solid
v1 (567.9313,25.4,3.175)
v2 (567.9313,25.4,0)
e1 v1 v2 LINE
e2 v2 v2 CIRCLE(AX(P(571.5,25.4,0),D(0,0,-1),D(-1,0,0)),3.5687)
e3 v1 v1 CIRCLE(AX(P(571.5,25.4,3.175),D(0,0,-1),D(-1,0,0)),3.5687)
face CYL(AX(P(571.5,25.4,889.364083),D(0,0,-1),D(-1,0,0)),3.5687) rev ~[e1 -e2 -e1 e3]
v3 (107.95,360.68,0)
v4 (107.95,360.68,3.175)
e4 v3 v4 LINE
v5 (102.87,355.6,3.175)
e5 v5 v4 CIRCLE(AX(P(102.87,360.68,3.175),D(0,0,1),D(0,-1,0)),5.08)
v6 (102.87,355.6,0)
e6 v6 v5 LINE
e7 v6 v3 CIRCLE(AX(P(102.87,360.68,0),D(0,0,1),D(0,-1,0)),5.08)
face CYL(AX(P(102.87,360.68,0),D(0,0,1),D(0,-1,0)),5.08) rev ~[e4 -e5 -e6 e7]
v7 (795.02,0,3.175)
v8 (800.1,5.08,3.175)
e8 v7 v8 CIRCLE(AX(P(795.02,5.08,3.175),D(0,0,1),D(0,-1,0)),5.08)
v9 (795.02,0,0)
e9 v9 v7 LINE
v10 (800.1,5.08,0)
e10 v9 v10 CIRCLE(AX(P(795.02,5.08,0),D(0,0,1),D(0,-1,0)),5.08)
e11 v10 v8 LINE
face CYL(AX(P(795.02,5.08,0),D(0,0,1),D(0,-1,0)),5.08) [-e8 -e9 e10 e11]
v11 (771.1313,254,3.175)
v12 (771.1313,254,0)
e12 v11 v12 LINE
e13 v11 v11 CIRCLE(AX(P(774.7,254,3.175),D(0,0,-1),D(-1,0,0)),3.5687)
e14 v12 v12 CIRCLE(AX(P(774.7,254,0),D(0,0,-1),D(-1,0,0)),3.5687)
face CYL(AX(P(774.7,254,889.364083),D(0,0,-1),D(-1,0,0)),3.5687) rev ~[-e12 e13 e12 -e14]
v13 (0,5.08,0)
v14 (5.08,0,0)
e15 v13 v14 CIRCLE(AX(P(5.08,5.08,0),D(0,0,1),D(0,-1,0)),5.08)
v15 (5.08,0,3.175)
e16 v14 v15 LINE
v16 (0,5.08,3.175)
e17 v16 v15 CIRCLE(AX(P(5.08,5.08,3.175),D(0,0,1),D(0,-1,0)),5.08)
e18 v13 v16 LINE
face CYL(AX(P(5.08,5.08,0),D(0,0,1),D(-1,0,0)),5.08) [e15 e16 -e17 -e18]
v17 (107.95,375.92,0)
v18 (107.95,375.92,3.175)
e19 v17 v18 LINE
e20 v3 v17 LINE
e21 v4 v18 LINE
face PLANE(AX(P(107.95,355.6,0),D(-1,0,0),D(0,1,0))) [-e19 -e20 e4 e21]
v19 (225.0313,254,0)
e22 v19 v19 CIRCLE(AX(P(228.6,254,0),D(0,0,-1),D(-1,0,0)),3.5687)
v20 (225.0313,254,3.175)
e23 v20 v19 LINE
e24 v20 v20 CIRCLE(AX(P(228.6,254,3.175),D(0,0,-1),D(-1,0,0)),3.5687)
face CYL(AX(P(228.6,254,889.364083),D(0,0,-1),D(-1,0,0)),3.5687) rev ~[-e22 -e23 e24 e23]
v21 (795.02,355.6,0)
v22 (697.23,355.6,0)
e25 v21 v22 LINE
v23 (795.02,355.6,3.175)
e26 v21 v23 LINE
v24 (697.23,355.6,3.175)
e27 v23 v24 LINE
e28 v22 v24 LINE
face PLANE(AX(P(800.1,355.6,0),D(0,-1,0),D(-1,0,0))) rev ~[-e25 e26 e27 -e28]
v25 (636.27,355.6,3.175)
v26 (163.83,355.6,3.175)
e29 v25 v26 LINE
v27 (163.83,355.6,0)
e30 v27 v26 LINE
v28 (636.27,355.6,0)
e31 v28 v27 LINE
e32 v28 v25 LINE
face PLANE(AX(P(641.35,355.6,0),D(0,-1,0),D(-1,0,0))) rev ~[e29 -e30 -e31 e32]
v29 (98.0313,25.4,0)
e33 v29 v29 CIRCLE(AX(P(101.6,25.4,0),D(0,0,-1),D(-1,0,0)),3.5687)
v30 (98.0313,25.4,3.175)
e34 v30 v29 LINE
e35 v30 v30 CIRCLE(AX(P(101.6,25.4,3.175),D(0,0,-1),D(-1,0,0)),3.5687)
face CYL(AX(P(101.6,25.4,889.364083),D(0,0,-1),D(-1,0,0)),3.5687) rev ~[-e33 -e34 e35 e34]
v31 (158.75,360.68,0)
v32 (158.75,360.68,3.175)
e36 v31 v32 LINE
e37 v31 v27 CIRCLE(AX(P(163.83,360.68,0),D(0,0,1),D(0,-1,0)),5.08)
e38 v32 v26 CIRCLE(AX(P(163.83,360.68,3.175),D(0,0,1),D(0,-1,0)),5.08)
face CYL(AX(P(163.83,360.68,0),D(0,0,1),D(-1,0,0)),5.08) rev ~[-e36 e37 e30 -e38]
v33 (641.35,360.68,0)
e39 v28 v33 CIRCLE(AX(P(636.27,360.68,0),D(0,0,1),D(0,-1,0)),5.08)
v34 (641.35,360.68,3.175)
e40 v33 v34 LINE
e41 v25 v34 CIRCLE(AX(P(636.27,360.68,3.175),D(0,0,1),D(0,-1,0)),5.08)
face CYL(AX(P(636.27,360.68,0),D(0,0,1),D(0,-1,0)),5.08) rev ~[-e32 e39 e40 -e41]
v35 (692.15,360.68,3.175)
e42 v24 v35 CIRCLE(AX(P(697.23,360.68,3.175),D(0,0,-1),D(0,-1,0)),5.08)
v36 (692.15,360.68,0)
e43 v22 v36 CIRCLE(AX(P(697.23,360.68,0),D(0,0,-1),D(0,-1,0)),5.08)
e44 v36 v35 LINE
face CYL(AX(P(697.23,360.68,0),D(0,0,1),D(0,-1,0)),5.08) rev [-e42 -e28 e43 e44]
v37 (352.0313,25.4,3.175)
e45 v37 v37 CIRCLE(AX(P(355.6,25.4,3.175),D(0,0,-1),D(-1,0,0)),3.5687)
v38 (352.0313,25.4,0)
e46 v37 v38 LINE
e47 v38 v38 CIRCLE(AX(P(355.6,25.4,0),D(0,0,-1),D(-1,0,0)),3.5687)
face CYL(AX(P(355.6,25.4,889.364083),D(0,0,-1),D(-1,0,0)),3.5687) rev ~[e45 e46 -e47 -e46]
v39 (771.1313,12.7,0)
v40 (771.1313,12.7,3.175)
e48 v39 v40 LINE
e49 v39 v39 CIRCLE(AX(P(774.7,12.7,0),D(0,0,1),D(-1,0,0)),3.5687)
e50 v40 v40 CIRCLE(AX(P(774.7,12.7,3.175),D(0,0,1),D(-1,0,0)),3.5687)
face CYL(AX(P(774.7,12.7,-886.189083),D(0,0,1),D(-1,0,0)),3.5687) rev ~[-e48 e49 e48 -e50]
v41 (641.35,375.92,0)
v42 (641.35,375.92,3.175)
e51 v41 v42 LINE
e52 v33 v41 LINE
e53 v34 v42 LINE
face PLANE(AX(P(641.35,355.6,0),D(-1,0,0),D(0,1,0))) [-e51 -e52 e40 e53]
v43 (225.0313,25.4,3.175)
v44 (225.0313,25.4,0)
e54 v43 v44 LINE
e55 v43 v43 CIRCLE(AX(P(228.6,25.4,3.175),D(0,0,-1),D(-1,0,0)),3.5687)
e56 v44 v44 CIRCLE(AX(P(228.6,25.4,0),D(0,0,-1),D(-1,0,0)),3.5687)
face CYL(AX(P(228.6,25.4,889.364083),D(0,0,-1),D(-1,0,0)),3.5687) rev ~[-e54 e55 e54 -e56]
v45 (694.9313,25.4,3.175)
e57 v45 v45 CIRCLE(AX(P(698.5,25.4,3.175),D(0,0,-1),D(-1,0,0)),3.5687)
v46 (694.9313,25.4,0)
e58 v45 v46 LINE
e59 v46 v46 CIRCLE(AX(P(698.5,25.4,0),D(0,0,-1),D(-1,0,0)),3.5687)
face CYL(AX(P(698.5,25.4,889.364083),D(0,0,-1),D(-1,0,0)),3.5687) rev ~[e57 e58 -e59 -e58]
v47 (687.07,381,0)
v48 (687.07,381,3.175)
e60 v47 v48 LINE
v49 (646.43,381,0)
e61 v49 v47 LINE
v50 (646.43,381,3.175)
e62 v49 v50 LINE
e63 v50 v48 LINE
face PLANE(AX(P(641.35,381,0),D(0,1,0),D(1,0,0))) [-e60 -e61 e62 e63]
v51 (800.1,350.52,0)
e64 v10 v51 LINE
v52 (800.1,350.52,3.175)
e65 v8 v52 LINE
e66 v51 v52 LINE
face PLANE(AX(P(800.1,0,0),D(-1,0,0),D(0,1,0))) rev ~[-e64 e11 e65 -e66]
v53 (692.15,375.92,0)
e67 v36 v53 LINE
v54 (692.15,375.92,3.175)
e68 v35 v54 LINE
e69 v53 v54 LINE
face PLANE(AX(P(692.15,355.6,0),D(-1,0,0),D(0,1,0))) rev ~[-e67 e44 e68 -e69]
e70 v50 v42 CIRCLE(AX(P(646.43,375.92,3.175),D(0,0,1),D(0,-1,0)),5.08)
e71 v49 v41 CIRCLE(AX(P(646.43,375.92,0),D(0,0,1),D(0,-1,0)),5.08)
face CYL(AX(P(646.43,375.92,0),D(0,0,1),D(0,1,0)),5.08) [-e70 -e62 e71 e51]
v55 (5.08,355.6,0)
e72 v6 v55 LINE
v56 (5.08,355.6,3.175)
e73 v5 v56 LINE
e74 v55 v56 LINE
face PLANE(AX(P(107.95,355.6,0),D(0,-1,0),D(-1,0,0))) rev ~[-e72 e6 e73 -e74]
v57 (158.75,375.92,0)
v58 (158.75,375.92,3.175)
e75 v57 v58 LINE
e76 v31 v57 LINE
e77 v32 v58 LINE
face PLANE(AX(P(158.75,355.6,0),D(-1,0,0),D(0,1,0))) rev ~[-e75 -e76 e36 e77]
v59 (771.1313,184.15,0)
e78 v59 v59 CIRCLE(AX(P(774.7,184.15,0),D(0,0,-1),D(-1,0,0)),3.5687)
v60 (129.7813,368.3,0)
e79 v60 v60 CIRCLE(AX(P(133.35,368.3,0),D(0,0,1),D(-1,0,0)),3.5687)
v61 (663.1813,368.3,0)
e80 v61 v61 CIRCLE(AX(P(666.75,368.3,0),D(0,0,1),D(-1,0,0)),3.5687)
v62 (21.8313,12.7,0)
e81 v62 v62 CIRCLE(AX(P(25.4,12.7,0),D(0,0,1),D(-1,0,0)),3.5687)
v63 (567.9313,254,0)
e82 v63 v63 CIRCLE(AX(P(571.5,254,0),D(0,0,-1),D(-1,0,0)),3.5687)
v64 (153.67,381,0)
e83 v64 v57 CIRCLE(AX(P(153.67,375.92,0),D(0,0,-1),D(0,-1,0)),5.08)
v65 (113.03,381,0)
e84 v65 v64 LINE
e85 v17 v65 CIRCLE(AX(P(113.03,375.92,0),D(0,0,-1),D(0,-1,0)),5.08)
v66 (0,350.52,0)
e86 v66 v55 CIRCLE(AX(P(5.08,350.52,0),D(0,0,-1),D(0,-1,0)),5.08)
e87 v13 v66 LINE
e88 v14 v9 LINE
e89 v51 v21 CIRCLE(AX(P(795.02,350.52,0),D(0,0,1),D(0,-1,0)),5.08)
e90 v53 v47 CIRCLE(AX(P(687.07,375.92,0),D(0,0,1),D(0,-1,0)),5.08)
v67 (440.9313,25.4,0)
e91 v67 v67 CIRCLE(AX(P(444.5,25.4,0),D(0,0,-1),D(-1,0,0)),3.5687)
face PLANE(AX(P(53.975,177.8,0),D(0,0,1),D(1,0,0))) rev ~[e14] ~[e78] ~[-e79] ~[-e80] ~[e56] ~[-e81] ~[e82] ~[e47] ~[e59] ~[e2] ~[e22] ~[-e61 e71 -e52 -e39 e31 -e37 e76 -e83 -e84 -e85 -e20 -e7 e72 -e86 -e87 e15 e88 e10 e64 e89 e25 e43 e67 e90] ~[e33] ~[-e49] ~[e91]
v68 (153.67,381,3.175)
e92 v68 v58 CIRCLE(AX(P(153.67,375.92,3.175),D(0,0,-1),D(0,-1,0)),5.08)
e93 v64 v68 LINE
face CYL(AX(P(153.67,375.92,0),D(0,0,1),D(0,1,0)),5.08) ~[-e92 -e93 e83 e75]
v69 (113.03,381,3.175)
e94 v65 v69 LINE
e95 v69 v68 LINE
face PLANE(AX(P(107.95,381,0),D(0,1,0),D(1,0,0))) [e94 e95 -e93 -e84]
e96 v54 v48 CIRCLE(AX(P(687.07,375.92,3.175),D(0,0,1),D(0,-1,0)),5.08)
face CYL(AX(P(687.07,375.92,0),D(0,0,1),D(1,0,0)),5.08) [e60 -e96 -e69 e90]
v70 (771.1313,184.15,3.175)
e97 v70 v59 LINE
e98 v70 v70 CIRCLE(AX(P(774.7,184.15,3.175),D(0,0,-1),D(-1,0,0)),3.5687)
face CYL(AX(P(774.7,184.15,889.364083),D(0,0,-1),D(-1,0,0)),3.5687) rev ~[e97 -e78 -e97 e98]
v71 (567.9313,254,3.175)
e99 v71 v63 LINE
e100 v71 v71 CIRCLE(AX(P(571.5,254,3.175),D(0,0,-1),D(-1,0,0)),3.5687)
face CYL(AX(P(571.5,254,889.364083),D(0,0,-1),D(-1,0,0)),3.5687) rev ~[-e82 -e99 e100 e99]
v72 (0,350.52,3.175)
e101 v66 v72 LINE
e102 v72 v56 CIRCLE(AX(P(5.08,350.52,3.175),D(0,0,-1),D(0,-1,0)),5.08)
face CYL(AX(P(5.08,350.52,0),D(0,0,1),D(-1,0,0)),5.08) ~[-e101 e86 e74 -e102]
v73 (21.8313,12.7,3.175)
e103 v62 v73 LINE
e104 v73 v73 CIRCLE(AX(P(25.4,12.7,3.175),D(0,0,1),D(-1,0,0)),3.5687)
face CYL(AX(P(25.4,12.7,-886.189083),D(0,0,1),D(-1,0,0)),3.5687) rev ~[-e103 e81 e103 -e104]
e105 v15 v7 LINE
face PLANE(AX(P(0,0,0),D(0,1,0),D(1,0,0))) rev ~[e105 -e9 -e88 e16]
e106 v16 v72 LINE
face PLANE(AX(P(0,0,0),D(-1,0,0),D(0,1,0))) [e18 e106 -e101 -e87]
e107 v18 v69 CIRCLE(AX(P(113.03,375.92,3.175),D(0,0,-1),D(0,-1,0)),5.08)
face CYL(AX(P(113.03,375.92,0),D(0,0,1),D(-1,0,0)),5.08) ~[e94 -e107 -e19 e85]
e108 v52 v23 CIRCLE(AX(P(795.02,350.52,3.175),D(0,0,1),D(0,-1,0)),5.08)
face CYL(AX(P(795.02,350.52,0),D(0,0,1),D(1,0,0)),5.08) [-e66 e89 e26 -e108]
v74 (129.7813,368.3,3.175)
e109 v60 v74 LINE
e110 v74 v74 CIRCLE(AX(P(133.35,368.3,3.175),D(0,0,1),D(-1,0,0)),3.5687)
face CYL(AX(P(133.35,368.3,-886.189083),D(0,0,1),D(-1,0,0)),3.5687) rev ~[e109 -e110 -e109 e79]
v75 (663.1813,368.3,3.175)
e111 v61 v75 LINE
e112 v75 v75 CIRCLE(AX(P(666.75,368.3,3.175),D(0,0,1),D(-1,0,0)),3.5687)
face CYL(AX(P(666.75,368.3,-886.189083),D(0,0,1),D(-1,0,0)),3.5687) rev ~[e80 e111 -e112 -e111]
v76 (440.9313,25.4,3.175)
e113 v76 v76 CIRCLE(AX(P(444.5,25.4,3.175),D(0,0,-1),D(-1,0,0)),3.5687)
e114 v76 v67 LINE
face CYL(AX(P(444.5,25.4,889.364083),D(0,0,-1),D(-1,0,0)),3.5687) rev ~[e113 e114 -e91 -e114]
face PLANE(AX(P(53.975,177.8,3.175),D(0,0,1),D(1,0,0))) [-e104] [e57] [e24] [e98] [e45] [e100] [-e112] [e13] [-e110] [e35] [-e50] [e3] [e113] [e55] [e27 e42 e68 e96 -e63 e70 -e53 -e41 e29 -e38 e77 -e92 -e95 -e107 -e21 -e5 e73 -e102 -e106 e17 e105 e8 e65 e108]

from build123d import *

# Parameters (mm, degrees)
F0_W     = 107.95
F0_H     = 355.6
F0_W_2   = 50.8
F0_H_2   = 25.4
F1_DEPTH = 3.175
F2_D     = 7.1374
F3_R     = 5.08
F5_D     = 7.1374


# Not quite as in the source:
# - a feature names something its author has since deleted; it is built from what else it names


with BuildPart() as f1:
    # F0 (on Top) → F1 (new body)
    with BuildSketch(Plane.XY):
        with Locations((53.975, 177.8)):
            Rectangle(F0_W, F0_H)
        Polygon((107.95, 355.6), (107.95, 0), (400.05, 0), (400.05, 355.6), (158.75, 355.6), align=None)
        with Locations((133.35, 368.3)):
            Rectangle(F0_W_2, F0_H_2)
        Polygon((400.05, 355.6), (400.05, 0), (692.15, 0), (692.15, 355.6), (641.35, 355.6), align=None)
        with Locations((746.125, 177.8)):
            Rectangle(F0_W, F0_H)
        with Locations((666.75, 368.3)):
            Rectangle(F0_W_2, F0_H_2)
    extrude(amount=F1_DEPTH)

    # F2 (through all)
    with Locations(Plane(origin=(0, 0, 0), x_dir=(1, 0, 0), z_dir=(0, 0, -1))):
        with Locations((133.35, -368.3), (666.75, -368.3), (25.4, -12.7), (774.7, -12.7)):
            Hole(F2_D / 2)

    # F3
    f3_edges = [f1.edges().sort_by_distance(p)[0] for p in [
        (0, 355.6, 1.5875),
        (107.95, 355.6, 1.5875),
        (107.95, 381, 1.5875),
        (158.75, 381, 1.5875),
        (158.75, 355.6, 1.5875),
        (692.15, 355.6, 1.5875),
        (692.15, 381, 1.5875),
        (641.35, 381, 1.5875),
        (641.35, 355.6, 1.5875),
        (800.1, 355.6, 1.5875),
        (800.1, 0, 1.5875),
        (0, 0, 1.5875),
    ]]
    fillet(f3_edges, radius=F3_R)

    # F5 (through all)
    with Locations(Plane.XY.offset(3.175)):
        with Locations((571.5, 254), (774.7, 254), (444.5, 25.4), (571.5, 25.4), (698.5, 25.4), (774.7, 184.15), (101.6, 25.4), (228.6, 25.4), (355.6, 25.4), (228.6, 254)):
            Hole(F5_D / 2)


solid = f1.part
